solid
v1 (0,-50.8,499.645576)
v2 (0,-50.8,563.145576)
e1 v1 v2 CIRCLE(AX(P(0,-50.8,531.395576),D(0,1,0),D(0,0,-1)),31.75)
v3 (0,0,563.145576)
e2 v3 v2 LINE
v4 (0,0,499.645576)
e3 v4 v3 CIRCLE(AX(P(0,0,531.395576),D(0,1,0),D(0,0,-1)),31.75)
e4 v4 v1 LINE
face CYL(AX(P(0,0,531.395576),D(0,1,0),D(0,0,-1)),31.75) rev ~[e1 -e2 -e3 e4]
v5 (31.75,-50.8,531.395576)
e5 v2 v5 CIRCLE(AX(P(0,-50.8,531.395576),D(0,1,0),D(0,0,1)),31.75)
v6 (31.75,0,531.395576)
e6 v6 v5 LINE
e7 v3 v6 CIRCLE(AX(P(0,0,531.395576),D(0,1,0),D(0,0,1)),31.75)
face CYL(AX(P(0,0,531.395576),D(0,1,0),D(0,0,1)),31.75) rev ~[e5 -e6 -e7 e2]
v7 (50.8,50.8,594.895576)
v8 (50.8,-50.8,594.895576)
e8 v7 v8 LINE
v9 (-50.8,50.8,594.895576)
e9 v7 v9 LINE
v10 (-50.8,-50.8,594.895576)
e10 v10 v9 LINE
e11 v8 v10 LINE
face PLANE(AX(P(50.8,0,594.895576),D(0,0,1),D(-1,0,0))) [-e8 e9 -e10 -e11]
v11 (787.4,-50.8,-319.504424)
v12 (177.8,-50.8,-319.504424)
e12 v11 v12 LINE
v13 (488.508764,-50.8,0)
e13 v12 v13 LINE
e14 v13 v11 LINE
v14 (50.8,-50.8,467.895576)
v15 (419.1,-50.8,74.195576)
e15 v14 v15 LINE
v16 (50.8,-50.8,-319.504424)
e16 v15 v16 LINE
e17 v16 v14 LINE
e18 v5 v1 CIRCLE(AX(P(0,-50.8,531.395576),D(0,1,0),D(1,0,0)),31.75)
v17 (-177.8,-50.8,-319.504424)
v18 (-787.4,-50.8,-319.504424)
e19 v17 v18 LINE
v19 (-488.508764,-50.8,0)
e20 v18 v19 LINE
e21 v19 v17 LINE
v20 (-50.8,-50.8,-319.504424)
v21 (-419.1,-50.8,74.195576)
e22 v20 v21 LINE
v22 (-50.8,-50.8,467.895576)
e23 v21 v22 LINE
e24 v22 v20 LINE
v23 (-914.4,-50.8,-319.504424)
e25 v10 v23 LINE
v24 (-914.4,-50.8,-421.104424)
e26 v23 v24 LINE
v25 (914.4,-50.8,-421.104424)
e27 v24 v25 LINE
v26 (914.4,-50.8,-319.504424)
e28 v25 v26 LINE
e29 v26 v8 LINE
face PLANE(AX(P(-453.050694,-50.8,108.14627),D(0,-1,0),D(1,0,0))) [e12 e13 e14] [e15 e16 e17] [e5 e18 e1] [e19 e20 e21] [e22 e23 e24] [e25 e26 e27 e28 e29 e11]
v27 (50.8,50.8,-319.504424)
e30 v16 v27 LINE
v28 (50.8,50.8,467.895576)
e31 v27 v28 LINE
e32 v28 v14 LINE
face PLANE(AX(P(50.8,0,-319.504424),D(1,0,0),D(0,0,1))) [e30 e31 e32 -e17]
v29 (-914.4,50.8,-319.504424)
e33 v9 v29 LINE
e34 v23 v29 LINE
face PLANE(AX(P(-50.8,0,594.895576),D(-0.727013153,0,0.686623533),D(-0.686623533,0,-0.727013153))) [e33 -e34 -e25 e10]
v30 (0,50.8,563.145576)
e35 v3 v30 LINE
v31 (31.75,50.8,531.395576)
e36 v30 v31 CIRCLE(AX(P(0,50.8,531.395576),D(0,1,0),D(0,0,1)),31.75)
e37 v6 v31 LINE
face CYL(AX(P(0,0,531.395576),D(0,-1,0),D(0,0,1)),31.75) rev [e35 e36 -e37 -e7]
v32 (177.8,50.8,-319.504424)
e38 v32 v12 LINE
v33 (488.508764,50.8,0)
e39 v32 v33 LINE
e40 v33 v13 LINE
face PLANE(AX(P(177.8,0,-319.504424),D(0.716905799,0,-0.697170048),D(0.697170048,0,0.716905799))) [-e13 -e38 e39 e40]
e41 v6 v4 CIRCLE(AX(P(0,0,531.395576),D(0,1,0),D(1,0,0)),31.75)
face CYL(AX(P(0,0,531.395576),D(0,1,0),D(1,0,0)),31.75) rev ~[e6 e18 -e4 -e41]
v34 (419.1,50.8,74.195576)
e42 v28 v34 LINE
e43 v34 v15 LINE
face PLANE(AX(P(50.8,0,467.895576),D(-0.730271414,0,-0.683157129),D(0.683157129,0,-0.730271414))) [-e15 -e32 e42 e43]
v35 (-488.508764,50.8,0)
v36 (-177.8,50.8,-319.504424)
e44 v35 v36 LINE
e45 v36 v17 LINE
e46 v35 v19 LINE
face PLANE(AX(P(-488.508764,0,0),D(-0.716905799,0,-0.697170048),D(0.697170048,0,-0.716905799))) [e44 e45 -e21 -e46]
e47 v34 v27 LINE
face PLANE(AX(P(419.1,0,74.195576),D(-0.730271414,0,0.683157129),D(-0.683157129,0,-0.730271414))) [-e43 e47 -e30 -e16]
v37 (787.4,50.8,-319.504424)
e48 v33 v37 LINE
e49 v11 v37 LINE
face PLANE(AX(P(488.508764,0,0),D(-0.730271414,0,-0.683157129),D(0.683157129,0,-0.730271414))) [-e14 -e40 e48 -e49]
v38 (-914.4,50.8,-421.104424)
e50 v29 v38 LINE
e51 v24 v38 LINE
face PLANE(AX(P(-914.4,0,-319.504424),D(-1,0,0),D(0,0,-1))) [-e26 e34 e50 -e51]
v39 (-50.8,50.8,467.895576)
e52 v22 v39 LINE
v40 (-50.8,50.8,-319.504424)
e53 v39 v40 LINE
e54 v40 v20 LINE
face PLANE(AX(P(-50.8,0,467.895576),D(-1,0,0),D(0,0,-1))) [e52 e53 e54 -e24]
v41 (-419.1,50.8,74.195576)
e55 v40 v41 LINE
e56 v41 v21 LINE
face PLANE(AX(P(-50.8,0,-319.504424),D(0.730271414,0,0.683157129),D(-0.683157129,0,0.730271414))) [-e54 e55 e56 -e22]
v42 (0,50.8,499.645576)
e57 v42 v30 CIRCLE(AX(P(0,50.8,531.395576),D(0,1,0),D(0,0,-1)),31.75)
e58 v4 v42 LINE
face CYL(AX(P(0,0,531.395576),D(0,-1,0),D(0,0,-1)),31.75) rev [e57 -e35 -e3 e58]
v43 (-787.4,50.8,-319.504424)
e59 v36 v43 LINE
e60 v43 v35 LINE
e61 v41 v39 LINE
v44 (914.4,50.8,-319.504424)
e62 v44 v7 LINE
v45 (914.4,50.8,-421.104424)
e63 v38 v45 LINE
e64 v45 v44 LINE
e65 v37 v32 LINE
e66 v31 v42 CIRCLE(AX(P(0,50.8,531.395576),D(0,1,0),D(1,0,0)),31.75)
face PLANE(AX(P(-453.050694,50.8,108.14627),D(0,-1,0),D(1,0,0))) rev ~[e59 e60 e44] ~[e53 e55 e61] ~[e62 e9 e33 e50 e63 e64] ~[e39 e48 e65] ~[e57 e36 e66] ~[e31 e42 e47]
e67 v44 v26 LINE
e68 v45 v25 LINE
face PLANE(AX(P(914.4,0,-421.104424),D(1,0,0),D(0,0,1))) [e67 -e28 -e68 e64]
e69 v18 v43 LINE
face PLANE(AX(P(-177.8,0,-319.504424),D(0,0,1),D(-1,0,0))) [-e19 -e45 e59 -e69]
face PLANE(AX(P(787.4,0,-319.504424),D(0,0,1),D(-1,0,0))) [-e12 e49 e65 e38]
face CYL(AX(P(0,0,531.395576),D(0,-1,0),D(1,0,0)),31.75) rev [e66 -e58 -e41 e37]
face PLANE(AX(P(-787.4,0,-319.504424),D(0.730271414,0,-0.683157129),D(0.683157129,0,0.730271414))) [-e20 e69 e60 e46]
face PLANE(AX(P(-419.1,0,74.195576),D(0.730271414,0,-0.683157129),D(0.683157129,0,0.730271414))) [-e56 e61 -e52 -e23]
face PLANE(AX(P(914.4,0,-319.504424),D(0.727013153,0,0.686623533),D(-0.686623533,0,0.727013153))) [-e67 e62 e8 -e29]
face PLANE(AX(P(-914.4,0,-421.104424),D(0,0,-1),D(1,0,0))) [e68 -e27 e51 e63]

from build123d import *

# Parameters (mm, degrees)
F0_W     = 50.8
F0_H     = 101.6
F1_DEPTH = 50.8


with BuildPart() as f1:
    # F0 (on Front) → F1 (new body, symmetric)
    with BuildSketch(Plane.XZ):
        Polygon((-488.5087642836, 0), (-419.1, 74.1955756135), (-50.8, 467.8955756135), (-50.8, 594.8955756135), (-914.4, -319.5044243865), (-787.4, -319.5044243865), align=None)
        Polygon((-177.8, -319.5044243865), (-50.8, -319.5044243865), (-419.1, 74.1955756135), (-488.5087642836, 0), align=None)
        Polygon((-50.8, -421.1044243865), (-50.8, -319.5044243865), (-177.8, -319.5044243865), (-787.4, -319.5044243865), (-914.4, -319.5044243865), (-914.4, -421.1044243865), align=None)
        with BuildLine():
            Line((-50.8, -319.5044243865), (0, -319.5044243865))
            Line((0, -319.5044243865), (0, 499.6455756135))
            ThreePointArc((0, 499.6455756135), (-31.75, 531.3955756135), (0, 563.1455756135))
            Line((0, 563.1455756135), (0, 594.8955756135))
            Line((0, 594.8955756135), (-50.8, 594.8955756135))
            Line((-50.8, 594.8955756135), (-50.8, 467.8955756135))
            Line((-50.8, 467.8955756135), (-50.8, -319.5044243865))
        make_face()
        with BuildLine():
            Line((0, 499.6455756135), (0, -319.5044243865))
            Line((0, -319.5044243865), (50.8, -319.5044243865))
            Line((50.8, -319.5044243865), (50.8, 467.8955756135))
            Line((50.8, 467.8955756135), (50.8, 594.8955756135))
            Line((50.8, 594.8955756135), (0, 594.8955756135))
            Line((0, 594.8955756135), (0, 563.1455756135))
            ThreePointArc((0, 563.1455756135), (22.4506403027, 553.8462159162), (31.75, 531.3955756135))
            ThreePointArc((31.75, 531.3955756135), (22.4506403027, 508.9449353108), (0, 499.6455756135))
        make_face()
        with Locations((25.4, -370.3044243865)):
            Rectangle(F0_W, F0_H)
        with Locations((-25.4, -370.3044243865)):
            Rectangle(F0_W, F0_H)
        Polygon((177.8, -319.5044243865), (50.8, -319.5044243865), (50.8, -421.1044243865), (914.4, -421.1044243865), (914.4, -319.5044243865), (787.4, -319.5044243865), align=None)
        Polygon((50.8, 594.8955756135), (50.8, 467.8955756135), (419.1, 74.1955756135), (488.5087642836, 0), (787.4, -319.5044243865), (914.4, -319.5044243865), align=None)
        Polygon((419.1, 74.1955756135), (50.8, -319.5044243865), (177.8, -319.5044243865), (488.5087642836, 0), align=None)
    extrude(amount=F1_DEPTH, both=True)


solid = f1.part
